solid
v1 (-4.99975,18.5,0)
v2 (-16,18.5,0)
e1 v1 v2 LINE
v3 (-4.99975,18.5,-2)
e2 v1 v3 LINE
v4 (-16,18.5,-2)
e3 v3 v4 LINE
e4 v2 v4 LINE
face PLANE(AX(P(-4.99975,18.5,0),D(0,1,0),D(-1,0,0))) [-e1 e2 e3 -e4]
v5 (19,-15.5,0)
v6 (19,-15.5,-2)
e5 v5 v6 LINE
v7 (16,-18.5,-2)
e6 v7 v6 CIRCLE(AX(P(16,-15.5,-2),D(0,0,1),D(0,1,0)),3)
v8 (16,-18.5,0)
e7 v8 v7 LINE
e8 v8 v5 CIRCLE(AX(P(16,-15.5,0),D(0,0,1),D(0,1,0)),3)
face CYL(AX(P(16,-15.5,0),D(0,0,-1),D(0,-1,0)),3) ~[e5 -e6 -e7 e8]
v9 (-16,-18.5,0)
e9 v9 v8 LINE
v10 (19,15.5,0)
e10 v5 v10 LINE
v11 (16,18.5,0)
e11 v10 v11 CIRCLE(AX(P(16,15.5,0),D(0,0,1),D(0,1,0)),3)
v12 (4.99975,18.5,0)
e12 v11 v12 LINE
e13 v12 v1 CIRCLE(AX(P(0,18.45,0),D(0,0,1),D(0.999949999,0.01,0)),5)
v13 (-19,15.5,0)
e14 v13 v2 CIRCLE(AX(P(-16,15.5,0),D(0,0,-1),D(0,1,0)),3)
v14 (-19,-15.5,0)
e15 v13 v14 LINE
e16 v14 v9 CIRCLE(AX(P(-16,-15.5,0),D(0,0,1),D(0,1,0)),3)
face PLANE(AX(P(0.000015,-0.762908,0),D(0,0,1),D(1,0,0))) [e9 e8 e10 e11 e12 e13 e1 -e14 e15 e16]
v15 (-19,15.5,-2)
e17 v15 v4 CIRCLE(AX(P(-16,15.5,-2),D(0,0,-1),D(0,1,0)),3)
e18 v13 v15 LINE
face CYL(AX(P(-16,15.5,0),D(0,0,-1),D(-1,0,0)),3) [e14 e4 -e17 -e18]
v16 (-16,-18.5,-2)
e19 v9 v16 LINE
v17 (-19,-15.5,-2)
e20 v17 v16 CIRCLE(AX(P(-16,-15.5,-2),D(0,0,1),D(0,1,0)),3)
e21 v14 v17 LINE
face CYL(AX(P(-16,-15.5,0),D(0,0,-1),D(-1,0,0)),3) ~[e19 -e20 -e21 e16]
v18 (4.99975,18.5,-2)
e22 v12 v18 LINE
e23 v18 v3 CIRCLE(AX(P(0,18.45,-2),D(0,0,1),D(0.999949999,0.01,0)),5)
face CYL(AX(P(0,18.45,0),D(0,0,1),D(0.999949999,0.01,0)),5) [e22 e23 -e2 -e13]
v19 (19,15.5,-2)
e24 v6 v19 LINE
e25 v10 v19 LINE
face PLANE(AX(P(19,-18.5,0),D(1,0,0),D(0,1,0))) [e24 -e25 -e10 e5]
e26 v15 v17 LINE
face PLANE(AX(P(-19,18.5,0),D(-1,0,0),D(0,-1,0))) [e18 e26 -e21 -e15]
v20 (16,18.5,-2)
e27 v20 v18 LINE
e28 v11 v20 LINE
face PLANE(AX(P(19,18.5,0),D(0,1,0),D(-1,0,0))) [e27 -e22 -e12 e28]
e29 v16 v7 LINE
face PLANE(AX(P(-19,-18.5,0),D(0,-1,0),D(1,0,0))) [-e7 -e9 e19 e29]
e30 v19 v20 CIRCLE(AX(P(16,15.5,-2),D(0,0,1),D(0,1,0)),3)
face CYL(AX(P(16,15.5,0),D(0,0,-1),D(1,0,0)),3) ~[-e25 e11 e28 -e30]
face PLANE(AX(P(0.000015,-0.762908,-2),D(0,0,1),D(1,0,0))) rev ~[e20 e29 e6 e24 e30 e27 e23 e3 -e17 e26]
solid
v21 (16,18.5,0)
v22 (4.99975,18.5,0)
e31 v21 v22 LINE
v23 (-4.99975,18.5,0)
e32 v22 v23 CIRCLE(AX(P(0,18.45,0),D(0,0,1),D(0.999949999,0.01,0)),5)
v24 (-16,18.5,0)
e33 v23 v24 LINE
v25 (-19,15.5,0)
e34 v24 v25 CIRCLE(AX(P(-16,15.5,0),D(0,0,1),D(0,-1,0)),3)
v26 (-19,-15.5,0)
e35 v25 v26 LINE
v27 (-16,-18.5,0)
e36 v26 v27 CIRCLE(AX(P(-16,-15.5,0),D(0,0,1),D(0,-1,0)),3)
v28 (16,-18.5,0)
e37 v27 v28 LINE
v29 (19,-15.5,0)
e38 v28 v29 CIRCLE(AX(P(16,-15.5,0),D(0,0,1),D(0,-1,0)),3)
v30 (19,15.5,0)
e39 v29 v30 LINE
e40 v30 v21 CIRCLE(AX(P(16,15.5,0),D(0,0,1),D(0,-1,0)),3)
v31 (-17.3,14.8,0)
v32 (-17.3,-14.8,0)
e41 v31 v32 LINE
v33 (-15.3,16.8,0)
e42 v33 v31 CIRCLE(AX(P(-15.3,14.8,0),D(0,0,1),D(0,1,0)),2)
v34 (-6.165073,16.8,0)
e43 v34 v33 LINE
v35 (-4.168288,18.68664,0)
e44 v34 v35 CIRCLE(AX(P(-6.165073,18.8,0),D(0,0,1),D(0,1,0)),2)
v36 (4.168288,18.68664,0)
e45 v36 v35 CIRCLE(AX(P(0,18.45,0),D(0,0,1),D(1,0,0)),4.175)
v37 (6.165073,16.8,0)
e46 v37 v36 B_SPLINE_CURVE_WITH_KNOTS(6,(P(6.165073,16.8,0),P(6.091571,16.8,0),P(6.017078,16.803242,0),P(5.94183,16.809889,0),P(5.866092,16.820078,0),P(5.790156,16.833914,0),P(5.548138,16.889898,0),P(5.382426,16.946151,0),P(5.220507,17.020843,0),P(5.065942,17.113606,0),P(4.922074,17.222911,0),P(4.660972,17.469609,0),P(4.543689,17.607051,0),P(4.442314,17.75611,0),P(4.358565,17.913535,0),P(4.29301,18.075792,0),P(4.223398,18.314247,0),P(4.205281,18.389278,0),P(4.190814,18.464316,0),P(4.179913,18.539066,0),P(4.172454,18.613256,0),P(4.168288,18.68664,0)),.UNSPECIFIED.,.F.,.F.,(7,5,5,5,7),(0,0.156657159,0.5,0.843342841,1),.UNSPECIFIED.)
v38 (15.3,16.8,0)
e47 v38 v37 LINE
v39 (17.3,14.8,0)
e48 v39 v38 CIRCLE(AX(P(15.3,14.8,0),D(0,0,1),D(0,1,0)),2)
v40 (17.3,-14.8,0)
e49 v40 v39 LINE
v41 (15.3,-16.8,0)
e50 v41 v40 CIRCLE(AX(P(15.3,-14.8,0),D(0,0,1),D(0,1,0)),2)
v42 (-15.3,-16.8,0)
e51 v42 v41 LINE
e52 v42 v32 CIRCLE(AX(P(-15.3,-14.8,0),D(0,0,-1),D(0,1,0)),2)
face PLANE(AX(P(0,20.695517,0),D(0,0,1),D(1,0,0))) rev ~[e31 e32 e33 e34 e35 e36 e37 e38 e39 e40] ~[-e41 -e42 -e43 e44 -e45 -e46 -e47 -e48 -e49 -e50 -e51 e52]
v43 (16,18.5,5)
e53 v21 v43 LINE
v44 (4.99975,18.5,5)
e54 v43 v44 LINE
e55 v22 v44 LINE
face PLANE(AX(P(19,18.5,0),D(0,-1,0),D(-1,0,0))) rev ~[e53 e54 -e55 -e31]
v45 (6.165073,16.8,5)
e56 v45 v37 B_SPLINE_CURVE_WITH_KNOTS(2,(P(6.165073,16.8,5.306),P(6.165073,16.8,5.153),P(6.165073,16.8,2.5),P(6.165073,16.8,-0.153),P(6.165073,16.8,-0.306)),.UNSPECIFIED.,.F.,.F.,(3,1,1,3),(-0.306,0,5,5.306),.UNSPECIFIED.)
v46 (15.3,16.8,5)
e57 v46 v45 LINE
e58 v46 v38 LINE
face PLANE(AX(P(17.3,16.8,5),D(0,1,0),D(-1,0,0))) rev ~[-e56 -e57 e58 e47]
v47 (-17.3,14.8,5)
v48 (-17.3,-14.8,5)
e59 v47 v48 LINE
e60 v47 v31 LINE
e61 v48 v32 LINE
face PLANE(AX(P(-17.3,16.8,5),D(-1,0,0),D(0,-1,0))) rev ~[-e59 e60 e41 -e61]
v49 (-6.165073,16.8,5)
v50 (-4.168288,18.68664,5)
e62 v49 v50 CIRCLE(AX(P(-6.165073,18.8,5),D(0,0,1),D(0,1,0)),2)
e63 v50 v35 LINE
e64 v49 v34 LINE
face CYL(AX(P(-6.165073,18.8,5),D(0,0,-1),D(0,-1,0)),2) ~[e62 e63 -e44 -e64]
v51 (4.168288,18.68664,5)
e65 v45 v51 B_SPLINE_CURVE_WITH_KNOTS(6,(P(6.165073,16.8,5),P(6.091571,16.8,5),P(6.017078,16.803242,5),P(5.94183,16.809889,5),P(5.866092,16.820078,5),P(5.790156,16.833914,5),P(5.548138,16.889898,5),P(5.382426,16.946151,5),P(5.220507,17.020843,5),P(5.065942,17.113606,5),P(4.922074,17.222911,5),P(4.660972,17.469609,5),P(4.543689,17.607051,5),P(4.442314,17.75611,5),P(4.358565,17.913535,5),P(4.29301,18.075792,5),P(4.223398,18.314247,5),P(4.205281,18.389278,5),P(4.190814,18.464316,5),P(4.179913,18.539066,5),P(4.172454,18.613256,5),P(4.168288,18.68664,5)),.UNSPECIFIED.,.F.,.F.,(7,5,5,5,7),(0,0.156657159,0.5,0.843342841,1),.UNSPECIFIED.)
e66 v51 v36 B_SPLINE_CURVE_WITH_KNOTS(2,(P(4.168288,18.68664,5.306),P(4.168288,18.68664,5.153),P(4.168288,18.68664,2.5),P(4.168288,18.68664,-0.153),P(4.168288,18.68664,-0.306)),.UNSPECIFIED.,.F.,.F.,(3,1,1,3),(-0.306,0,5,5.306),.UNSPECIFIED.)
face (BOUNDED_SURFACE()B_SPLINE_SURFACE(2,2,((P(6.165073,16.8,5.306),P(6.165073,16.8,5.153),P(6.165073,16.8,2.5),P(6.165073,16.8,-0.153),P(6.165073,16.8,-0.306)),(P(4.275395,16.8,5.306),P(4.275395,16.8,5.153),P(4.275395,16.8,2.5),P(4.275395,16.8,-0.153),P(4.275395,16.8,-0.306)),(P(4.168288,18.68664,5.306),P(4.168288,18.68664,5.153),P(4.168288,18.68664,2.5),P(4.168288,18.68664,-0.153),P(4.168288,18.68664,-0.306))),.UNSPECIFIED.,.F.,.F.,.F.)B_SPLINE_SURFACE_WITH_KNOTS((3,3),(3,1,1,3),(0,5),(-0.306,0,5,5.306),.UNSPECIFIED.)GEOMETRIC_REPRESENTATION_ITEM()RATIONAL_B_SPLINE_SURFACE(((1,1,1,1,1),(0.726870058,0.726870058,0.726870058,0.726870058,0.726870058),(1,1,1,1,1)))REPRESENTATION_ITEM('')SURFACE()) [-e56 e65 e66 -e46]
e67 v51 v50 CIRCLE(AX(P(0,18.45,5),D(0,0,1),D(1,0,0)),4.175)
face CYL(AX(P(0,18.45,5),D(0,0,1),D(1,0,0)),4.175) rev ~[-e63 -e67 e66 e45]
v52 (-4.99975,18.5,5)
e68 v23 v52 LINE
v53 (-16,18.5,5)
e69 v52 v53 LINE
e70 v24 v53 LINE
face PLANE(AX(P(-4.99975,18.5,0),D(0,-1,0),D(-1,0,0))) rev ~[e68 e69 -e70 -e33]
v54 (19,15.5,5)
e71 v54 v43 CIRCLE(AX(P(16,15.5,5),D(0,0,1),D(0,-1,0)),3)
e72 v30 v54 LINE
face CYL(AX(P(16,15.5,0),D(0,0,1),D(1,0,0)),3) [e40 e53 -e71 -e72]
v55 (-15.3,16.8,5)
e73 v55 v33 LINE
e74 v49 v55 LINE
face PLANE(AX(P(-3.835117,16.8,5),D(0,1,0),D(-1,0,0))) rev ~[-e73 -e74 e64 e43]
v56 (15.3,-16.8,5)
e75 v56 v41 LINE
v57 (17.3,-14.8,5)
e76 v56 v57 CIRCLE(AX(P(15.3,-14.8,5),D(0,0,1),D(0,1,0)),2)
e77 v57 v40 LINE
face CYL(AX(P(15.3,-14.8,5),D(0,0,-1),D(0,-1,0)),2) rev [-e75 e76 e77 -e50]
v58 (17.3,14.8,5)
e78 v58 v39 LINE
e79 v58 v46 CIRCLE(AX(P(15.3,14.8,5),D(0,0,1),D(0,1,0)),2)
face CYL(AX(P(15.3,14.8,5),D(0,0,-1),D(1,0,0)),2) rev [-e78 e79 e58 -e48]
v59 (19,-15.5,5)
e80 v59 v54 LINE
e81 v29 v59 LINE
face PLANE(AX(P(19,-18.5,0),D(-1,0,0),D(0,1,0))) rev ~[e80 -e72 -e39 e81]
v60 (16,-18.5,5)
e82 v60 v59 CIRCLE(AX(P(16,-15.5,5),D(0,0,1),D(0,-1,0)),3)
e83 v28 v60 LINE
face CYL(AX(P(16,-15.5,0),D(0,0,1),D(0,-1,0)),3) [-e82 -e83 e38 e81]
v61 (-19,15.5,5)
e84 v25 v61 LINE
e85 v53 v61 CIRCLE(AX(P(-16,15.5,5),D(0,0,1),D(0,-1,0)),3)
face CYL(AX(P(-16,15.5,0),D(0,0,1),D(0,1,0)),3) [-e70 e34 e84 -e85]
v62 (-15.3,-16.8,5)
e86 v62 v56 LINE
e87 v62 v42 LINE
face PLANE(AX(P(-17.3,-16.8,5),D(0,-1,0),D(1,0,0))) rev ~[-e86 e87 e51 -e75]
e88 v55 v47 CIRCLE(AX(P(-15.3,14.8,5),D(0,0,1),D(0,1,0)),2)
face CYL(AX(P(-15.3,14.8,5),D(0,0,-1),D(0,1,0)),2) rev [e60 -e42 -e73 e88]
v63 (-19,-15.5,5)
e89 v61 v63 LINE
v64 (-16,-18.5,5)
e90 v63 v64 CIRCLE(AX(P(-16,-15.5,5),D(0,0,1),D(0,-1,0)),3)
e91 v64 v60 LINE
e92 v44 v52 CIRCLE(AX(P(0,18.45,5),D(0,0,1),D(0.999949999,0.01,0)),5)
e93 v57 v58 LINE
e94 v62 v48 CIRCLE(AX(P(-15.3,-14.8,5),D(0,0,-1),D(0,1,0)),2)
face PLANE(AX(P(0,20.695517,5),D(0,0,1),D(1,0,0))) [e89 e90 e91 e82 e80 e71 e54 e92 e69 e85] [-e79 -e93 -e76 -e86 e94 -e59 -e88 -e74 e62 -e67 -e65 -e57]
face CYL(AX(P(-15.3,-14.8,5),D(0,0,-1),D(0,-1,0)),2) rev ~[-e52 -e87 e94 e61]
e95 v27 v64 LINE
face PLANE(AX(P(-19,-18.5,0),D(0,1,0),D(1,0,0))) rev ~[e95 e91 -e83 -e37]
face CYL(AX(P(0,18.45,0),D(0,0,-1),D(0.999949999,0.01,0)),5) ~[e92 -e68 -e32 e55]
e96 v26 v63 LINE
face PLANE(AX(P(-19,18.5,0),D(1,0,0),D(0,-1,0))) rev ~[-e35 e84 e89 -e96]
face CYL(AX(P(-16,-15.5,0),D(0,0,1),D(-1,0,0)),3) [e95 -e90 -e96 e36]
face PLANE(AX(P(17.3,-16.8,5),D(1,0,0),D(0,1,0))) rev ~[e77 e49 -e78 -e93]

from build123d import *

# Parameters (mm, degrees)
F1_DEPTH = 2
F2_DEPTH = 5
F4_R     = 3
F4_2_R   = 3
F5_DEPTH = 5
F6_R     = 2
F7_R     = 2


with BuildPart() as f1:
    # F0 (on Top) → F1 (new body)
    with BuildSketch(Plane.XY):
        with BuildLine():
            Line((16, 15.5), (16, -15.5))
            Line((16, -15.5), (-16, -15.5))
            Line((-16, -15.5), (-16, 15.5))
            Line((-16, 15.5), (-4.0370162249, 15.5))
            ThreePointArc((-4.0370162249, 15.5), (-4.7608597882, 16.9221865044), (-4.9997499937, 18.5))
            Line((-4.9997499937, 18.5), (-19, 18.5))
            Line((-19, 18.5), (-19, -18.5))
            Line((-19, -18.5), (19, -18.5))
            Line((19, -18.5), (19, 18.5))
            Line((19, 18.5), (4.9997499937, 18.5))
            ThreePointArc((4.9997499937, 18.5), (4.999937498, 18.4750003125), (5, 18.45))
            ThreePointArc((5, 18.45), (4.7531611126, 16.8984010061), (4.0370162249, 15.5))
            Line((4.0370162249, 15.5), (16, 15.5))
        make_face()
        with BuildLine():
            Line((-16, -15.5), (16, -15.5))
            Line((16, -15.5), (16, 15.5))
            Line((16, 15.5), (4.0370162249, 15.5))
            ThreePointArc((4.0370162249, 15.5), (0, 13.45), (-4.0370162249, 15.5))
            Line((-4.0370162249, 15.5), (-16, 15.5))
            Line((-16, 15.5), (-16, -15.5))
        make_face()
        with BuildLine():
            ThreePointArc((-4.0370162249, 15.5), (0, 13.45), (4.0370162249, 15.5))
            Line((4.0370162249, 15.5), (1.6395502432, 15.5))
            ThreePointArc((1.6395502432, 15.5), (0, 15.075), (-1.6395502432, 15.5))
            Line((-1.6395502432, 15.5), (-4.0370162249, 15.5))
        make_face()
        with BuildLine():
            Line((1.6395502432, 15.5), (4.0370162249, 15.5))
            ThreePointArc((4.0370162249, 15.5), (4.7531611126, 16.8984010061), (5, 18.45))
            ThreePointArc((5, 18.45), (4.999937498, 18.4750003125), (4.9997499937, 18.5))
            Line((4.9997499937, 18.5), (3.3746296093, 18.5))
            ThreePointArc((3.3746296093, 18.5), (3.3749074011, 18.4750006859), (3.375, 18.45))
            ThreePointArc((3.375, 18.45), (2.908960903, 16.7386930537), (1.6395502432, 15.5))
        make_face()
        with BuildLine():
            ThreePointArc((-4.9997499937, 18.5), (-4.7608597882, 16.9221865044), (-4.0370162249, 15.5))
            Line((-4.0370162249, 15.5), (-1.6395502432, 15.5))
            ThreePointArc((-1.6395502432, 15.5), (-2.9215577862, 16.7602884561), (-3.3746296093, 18.5))
            Line((-3.3746296093, 18.5), (-4.9997499937, 18.5))
        make_face()
        with BuildLine():
            ThreePointArc((-1.6395502432, 15.5), (0, 15.075), (1.6395502432, 15.5))
            Line((1.6395502432, 15.5), (-1.6395502432, 15.5))
        make_face()
        with BuildLine():
            Line((-1.6395502432, 15.5), (1.6395502432, 15.5))
            ThreePointArc((1.6395502432, 15.5), (2.908960903, 16.7386930537), (3.375, 18.45))
            ThreePointArc((3.375, 18.45), (3.3749074011, 18.4750006859), (3.3746296093, 18.5))
            Line((3.3746296093, 18.5), (-3.3746296093, 18.5))
            ThreePointArc((-3.3746296093, 18.5), (-2.9215577862, 16.7602884561), (-1.6395502432, 15.5))
        make_face()
        with BuildLine():
            ThreePointArc((4.9997499937, 18.5), (0, 23.45), (-4.9997499937, 18.5))
            Line((-4.9997499937, 18.5), (-3.3746296093, 18.5))
            ThreePointArc((-3.3746296093, 18.5), (0, 21.825), (3.3746296093, 18.5))
            Line((3.3746296093, 18.5), (4.9997499937, 18.5))
        make_face()
        with BuildLine():
            ThreePointArc((3.3746296093, 18.5), (0, 21.825), (-3.3746296093, 18.5))
            Line((-3.3746296093, 18.5), (3.3746296093, 18.5))
        make_face()
    extrude(amount=-F1_DEPTH)

    # F4
    f4_edges = [f1.edges().sort_by_distance(p)[0] for p in [
        (-19, -18.5, -1),
        (19, -18.5, -1),
        (19, 18.5, -1),
        (-19, 18.5, -1),
    ]]
    fillet(f4_edges, radius=F4_R)


with BuildPart() as f2:
    # F0 (on Top) → F2 (new body)
    with BuildSketch(Plane.XY):
        with BuildLine():
            ThreePointArc((4.9997499937, 18.5), (0, 23.45), (-4.9997499937, 18.5))
            Line((-4.9997499937, 18.5), (-3.3746296093, 18.5))
            ThreePointArc((-3.3746296093, 18.5), (0, 21.825), (3.3746296093, 18.5))
            Line((3.3746296093, 18.5), (4.9997499937, 18.5))
        make_face()
        with BuildLine():
            Line((16, 15.5), (16, -15.5))
            Line((16, -15.5), (-16, -15.5))
            Line((-16, -15.5), (-16, 15.5))
            Line((-16, 15.5), (-4.0370162249, 15.5))
            ThreePointArc((-4.0370162249, 15.5), (-4.7608597882, 16.9221865044), (-4.9997499937, 18.5))
            Line((-4.9997499937, 18.5), (-19, 18.5))
            Line((-19, 18.5), (-19, -18.5))
            Line((-19, -18.5), (19, -18.5))
            Line((19, -18.5), (19, 18.5))
            Line((19, 18.5), (4.9997499937, 18.5))
            ThreePointArc((4.9997499937, 18.5), (4.999937498, 18.4750003125), (5, 18.45))
            ThreePointArc((5, 18.45), (4.7531611126, 16.8984010061), (4.0370162249, 15.5))
            Line((4.0370162249, 15.5), (16, 15.5))
        make_face()
        with BuildLine():
            Line((1.6395502432, 15.5), (4.0370162249, 15.5))
            ThreePointArc((4.0370162249, 15.5), (4.7531611126, 16.8984010061), (5, 18.45))
            ThreePointArc((5, 18.45), (4.999937498, 18.4750003125), (4.9997499937, 18.5))
            Line((4.9997499937, 18.5), (3.3746296093, 18.5))
            ThreePointArc((3.3746296093, 18.5), (3.3749074011, 18.4750006859), (3.375, 18.45))
            ThreePointArc((3.375, 18.45), (2.908960903, 16.7386930537), (1.6395502432, 15.5))
        make_face()
        with BuildLine():
            ThreePointArc((-4.9997499937, 18.5), (-4.7608597882, 16.9221865044), (-4.0370162249, 15.5))
            Line((-4.0370162249, 15.5), (-1.6395502432, 15.5))
            ThreePointArc((-1.6395502432, 15.5), (-2.9215577862, 16.7602884561), (-3.3746296093, 18.5))
            Line((-3.3746296093, 18.5), (-4.9997499937, 18.5))
        make_face()
    extrude(amount=F2_DEPTH)

    # F4#2
    f4_2_edges = [f2.edges().sort_by_distance(p)[0] for p in [
        (19, 18.5, 2.5),
        (-19, 18.5, 2.5),
        (19, -18.5, 2.5),
        (-19, -18.5, 2.5),
    ]]
    fillet(f4_2_edges, radius=F4_2_R)

    # F3 (on face) → F5 (cut)
    with BuildSketch(Plane.XY.offset(5)):
        with BuildLine():
            Line((-17.3, -16.8), (17.3, -16.8))
            Line((17.3, -16.8), (17.3, 16.8))
            Line((17.3, 16.8), (3.8351173385, 16.8))
            ThreePointArc((3.8351173385, 16.8), (0, 14.275), (-3.8351173385, 16.8))
            Line((-3.8351173385, 16.8), (-17.3, 16.8))
            Line((-17.3, 16.8), (-17.3, -16.8))
        make_face()
        with BuildLine():
            ThreePointArc((-3.8351173385, 16.8), (0, 14.275), (3.8351173385, 16.8))
            Line((3.8351173385, 16.8), (-3.8351173385, 16.8))
        make_face()
        with BuildLine():
            Line((-3.8351173385, 16.8), (3.8351173385, 16.8))
            ThreePointArc((3.8351173385, 16.8), (4.0891466034, 17.6076787692), (4.175, 18.45))
            ThreePointArc((4.175, 18.45), (-0.8423212308, 22.5391466034), (-3.8351173385, 16.8))
        make_face()
    extrude(amount=-F5_DEPTH, mode=Mode.SUBTRACT)

    # F6
    f6_edges = [f2.edges().sort_by_distance(p)[0] for p in [
        (-17.3, 16.8, 2.5),
        (17.3, 16.8, 2.5),
        (17.3, -16.8, 2.5),
        (-17.3, -16.8, 2.5),
    ]]
    fillet(f6_edges, radius=F6_R)

    # F7
    f7_edges = [f2.edges().sort_by_distance(p)[0] for p in [
        (-3.835117, 16.8, 2.5),
        (3.835117, 16.8, 2.5),
    ]]
    fillet(f7_edges, radius=F7_R)


solid = Compound([f1.part, f2.part])
